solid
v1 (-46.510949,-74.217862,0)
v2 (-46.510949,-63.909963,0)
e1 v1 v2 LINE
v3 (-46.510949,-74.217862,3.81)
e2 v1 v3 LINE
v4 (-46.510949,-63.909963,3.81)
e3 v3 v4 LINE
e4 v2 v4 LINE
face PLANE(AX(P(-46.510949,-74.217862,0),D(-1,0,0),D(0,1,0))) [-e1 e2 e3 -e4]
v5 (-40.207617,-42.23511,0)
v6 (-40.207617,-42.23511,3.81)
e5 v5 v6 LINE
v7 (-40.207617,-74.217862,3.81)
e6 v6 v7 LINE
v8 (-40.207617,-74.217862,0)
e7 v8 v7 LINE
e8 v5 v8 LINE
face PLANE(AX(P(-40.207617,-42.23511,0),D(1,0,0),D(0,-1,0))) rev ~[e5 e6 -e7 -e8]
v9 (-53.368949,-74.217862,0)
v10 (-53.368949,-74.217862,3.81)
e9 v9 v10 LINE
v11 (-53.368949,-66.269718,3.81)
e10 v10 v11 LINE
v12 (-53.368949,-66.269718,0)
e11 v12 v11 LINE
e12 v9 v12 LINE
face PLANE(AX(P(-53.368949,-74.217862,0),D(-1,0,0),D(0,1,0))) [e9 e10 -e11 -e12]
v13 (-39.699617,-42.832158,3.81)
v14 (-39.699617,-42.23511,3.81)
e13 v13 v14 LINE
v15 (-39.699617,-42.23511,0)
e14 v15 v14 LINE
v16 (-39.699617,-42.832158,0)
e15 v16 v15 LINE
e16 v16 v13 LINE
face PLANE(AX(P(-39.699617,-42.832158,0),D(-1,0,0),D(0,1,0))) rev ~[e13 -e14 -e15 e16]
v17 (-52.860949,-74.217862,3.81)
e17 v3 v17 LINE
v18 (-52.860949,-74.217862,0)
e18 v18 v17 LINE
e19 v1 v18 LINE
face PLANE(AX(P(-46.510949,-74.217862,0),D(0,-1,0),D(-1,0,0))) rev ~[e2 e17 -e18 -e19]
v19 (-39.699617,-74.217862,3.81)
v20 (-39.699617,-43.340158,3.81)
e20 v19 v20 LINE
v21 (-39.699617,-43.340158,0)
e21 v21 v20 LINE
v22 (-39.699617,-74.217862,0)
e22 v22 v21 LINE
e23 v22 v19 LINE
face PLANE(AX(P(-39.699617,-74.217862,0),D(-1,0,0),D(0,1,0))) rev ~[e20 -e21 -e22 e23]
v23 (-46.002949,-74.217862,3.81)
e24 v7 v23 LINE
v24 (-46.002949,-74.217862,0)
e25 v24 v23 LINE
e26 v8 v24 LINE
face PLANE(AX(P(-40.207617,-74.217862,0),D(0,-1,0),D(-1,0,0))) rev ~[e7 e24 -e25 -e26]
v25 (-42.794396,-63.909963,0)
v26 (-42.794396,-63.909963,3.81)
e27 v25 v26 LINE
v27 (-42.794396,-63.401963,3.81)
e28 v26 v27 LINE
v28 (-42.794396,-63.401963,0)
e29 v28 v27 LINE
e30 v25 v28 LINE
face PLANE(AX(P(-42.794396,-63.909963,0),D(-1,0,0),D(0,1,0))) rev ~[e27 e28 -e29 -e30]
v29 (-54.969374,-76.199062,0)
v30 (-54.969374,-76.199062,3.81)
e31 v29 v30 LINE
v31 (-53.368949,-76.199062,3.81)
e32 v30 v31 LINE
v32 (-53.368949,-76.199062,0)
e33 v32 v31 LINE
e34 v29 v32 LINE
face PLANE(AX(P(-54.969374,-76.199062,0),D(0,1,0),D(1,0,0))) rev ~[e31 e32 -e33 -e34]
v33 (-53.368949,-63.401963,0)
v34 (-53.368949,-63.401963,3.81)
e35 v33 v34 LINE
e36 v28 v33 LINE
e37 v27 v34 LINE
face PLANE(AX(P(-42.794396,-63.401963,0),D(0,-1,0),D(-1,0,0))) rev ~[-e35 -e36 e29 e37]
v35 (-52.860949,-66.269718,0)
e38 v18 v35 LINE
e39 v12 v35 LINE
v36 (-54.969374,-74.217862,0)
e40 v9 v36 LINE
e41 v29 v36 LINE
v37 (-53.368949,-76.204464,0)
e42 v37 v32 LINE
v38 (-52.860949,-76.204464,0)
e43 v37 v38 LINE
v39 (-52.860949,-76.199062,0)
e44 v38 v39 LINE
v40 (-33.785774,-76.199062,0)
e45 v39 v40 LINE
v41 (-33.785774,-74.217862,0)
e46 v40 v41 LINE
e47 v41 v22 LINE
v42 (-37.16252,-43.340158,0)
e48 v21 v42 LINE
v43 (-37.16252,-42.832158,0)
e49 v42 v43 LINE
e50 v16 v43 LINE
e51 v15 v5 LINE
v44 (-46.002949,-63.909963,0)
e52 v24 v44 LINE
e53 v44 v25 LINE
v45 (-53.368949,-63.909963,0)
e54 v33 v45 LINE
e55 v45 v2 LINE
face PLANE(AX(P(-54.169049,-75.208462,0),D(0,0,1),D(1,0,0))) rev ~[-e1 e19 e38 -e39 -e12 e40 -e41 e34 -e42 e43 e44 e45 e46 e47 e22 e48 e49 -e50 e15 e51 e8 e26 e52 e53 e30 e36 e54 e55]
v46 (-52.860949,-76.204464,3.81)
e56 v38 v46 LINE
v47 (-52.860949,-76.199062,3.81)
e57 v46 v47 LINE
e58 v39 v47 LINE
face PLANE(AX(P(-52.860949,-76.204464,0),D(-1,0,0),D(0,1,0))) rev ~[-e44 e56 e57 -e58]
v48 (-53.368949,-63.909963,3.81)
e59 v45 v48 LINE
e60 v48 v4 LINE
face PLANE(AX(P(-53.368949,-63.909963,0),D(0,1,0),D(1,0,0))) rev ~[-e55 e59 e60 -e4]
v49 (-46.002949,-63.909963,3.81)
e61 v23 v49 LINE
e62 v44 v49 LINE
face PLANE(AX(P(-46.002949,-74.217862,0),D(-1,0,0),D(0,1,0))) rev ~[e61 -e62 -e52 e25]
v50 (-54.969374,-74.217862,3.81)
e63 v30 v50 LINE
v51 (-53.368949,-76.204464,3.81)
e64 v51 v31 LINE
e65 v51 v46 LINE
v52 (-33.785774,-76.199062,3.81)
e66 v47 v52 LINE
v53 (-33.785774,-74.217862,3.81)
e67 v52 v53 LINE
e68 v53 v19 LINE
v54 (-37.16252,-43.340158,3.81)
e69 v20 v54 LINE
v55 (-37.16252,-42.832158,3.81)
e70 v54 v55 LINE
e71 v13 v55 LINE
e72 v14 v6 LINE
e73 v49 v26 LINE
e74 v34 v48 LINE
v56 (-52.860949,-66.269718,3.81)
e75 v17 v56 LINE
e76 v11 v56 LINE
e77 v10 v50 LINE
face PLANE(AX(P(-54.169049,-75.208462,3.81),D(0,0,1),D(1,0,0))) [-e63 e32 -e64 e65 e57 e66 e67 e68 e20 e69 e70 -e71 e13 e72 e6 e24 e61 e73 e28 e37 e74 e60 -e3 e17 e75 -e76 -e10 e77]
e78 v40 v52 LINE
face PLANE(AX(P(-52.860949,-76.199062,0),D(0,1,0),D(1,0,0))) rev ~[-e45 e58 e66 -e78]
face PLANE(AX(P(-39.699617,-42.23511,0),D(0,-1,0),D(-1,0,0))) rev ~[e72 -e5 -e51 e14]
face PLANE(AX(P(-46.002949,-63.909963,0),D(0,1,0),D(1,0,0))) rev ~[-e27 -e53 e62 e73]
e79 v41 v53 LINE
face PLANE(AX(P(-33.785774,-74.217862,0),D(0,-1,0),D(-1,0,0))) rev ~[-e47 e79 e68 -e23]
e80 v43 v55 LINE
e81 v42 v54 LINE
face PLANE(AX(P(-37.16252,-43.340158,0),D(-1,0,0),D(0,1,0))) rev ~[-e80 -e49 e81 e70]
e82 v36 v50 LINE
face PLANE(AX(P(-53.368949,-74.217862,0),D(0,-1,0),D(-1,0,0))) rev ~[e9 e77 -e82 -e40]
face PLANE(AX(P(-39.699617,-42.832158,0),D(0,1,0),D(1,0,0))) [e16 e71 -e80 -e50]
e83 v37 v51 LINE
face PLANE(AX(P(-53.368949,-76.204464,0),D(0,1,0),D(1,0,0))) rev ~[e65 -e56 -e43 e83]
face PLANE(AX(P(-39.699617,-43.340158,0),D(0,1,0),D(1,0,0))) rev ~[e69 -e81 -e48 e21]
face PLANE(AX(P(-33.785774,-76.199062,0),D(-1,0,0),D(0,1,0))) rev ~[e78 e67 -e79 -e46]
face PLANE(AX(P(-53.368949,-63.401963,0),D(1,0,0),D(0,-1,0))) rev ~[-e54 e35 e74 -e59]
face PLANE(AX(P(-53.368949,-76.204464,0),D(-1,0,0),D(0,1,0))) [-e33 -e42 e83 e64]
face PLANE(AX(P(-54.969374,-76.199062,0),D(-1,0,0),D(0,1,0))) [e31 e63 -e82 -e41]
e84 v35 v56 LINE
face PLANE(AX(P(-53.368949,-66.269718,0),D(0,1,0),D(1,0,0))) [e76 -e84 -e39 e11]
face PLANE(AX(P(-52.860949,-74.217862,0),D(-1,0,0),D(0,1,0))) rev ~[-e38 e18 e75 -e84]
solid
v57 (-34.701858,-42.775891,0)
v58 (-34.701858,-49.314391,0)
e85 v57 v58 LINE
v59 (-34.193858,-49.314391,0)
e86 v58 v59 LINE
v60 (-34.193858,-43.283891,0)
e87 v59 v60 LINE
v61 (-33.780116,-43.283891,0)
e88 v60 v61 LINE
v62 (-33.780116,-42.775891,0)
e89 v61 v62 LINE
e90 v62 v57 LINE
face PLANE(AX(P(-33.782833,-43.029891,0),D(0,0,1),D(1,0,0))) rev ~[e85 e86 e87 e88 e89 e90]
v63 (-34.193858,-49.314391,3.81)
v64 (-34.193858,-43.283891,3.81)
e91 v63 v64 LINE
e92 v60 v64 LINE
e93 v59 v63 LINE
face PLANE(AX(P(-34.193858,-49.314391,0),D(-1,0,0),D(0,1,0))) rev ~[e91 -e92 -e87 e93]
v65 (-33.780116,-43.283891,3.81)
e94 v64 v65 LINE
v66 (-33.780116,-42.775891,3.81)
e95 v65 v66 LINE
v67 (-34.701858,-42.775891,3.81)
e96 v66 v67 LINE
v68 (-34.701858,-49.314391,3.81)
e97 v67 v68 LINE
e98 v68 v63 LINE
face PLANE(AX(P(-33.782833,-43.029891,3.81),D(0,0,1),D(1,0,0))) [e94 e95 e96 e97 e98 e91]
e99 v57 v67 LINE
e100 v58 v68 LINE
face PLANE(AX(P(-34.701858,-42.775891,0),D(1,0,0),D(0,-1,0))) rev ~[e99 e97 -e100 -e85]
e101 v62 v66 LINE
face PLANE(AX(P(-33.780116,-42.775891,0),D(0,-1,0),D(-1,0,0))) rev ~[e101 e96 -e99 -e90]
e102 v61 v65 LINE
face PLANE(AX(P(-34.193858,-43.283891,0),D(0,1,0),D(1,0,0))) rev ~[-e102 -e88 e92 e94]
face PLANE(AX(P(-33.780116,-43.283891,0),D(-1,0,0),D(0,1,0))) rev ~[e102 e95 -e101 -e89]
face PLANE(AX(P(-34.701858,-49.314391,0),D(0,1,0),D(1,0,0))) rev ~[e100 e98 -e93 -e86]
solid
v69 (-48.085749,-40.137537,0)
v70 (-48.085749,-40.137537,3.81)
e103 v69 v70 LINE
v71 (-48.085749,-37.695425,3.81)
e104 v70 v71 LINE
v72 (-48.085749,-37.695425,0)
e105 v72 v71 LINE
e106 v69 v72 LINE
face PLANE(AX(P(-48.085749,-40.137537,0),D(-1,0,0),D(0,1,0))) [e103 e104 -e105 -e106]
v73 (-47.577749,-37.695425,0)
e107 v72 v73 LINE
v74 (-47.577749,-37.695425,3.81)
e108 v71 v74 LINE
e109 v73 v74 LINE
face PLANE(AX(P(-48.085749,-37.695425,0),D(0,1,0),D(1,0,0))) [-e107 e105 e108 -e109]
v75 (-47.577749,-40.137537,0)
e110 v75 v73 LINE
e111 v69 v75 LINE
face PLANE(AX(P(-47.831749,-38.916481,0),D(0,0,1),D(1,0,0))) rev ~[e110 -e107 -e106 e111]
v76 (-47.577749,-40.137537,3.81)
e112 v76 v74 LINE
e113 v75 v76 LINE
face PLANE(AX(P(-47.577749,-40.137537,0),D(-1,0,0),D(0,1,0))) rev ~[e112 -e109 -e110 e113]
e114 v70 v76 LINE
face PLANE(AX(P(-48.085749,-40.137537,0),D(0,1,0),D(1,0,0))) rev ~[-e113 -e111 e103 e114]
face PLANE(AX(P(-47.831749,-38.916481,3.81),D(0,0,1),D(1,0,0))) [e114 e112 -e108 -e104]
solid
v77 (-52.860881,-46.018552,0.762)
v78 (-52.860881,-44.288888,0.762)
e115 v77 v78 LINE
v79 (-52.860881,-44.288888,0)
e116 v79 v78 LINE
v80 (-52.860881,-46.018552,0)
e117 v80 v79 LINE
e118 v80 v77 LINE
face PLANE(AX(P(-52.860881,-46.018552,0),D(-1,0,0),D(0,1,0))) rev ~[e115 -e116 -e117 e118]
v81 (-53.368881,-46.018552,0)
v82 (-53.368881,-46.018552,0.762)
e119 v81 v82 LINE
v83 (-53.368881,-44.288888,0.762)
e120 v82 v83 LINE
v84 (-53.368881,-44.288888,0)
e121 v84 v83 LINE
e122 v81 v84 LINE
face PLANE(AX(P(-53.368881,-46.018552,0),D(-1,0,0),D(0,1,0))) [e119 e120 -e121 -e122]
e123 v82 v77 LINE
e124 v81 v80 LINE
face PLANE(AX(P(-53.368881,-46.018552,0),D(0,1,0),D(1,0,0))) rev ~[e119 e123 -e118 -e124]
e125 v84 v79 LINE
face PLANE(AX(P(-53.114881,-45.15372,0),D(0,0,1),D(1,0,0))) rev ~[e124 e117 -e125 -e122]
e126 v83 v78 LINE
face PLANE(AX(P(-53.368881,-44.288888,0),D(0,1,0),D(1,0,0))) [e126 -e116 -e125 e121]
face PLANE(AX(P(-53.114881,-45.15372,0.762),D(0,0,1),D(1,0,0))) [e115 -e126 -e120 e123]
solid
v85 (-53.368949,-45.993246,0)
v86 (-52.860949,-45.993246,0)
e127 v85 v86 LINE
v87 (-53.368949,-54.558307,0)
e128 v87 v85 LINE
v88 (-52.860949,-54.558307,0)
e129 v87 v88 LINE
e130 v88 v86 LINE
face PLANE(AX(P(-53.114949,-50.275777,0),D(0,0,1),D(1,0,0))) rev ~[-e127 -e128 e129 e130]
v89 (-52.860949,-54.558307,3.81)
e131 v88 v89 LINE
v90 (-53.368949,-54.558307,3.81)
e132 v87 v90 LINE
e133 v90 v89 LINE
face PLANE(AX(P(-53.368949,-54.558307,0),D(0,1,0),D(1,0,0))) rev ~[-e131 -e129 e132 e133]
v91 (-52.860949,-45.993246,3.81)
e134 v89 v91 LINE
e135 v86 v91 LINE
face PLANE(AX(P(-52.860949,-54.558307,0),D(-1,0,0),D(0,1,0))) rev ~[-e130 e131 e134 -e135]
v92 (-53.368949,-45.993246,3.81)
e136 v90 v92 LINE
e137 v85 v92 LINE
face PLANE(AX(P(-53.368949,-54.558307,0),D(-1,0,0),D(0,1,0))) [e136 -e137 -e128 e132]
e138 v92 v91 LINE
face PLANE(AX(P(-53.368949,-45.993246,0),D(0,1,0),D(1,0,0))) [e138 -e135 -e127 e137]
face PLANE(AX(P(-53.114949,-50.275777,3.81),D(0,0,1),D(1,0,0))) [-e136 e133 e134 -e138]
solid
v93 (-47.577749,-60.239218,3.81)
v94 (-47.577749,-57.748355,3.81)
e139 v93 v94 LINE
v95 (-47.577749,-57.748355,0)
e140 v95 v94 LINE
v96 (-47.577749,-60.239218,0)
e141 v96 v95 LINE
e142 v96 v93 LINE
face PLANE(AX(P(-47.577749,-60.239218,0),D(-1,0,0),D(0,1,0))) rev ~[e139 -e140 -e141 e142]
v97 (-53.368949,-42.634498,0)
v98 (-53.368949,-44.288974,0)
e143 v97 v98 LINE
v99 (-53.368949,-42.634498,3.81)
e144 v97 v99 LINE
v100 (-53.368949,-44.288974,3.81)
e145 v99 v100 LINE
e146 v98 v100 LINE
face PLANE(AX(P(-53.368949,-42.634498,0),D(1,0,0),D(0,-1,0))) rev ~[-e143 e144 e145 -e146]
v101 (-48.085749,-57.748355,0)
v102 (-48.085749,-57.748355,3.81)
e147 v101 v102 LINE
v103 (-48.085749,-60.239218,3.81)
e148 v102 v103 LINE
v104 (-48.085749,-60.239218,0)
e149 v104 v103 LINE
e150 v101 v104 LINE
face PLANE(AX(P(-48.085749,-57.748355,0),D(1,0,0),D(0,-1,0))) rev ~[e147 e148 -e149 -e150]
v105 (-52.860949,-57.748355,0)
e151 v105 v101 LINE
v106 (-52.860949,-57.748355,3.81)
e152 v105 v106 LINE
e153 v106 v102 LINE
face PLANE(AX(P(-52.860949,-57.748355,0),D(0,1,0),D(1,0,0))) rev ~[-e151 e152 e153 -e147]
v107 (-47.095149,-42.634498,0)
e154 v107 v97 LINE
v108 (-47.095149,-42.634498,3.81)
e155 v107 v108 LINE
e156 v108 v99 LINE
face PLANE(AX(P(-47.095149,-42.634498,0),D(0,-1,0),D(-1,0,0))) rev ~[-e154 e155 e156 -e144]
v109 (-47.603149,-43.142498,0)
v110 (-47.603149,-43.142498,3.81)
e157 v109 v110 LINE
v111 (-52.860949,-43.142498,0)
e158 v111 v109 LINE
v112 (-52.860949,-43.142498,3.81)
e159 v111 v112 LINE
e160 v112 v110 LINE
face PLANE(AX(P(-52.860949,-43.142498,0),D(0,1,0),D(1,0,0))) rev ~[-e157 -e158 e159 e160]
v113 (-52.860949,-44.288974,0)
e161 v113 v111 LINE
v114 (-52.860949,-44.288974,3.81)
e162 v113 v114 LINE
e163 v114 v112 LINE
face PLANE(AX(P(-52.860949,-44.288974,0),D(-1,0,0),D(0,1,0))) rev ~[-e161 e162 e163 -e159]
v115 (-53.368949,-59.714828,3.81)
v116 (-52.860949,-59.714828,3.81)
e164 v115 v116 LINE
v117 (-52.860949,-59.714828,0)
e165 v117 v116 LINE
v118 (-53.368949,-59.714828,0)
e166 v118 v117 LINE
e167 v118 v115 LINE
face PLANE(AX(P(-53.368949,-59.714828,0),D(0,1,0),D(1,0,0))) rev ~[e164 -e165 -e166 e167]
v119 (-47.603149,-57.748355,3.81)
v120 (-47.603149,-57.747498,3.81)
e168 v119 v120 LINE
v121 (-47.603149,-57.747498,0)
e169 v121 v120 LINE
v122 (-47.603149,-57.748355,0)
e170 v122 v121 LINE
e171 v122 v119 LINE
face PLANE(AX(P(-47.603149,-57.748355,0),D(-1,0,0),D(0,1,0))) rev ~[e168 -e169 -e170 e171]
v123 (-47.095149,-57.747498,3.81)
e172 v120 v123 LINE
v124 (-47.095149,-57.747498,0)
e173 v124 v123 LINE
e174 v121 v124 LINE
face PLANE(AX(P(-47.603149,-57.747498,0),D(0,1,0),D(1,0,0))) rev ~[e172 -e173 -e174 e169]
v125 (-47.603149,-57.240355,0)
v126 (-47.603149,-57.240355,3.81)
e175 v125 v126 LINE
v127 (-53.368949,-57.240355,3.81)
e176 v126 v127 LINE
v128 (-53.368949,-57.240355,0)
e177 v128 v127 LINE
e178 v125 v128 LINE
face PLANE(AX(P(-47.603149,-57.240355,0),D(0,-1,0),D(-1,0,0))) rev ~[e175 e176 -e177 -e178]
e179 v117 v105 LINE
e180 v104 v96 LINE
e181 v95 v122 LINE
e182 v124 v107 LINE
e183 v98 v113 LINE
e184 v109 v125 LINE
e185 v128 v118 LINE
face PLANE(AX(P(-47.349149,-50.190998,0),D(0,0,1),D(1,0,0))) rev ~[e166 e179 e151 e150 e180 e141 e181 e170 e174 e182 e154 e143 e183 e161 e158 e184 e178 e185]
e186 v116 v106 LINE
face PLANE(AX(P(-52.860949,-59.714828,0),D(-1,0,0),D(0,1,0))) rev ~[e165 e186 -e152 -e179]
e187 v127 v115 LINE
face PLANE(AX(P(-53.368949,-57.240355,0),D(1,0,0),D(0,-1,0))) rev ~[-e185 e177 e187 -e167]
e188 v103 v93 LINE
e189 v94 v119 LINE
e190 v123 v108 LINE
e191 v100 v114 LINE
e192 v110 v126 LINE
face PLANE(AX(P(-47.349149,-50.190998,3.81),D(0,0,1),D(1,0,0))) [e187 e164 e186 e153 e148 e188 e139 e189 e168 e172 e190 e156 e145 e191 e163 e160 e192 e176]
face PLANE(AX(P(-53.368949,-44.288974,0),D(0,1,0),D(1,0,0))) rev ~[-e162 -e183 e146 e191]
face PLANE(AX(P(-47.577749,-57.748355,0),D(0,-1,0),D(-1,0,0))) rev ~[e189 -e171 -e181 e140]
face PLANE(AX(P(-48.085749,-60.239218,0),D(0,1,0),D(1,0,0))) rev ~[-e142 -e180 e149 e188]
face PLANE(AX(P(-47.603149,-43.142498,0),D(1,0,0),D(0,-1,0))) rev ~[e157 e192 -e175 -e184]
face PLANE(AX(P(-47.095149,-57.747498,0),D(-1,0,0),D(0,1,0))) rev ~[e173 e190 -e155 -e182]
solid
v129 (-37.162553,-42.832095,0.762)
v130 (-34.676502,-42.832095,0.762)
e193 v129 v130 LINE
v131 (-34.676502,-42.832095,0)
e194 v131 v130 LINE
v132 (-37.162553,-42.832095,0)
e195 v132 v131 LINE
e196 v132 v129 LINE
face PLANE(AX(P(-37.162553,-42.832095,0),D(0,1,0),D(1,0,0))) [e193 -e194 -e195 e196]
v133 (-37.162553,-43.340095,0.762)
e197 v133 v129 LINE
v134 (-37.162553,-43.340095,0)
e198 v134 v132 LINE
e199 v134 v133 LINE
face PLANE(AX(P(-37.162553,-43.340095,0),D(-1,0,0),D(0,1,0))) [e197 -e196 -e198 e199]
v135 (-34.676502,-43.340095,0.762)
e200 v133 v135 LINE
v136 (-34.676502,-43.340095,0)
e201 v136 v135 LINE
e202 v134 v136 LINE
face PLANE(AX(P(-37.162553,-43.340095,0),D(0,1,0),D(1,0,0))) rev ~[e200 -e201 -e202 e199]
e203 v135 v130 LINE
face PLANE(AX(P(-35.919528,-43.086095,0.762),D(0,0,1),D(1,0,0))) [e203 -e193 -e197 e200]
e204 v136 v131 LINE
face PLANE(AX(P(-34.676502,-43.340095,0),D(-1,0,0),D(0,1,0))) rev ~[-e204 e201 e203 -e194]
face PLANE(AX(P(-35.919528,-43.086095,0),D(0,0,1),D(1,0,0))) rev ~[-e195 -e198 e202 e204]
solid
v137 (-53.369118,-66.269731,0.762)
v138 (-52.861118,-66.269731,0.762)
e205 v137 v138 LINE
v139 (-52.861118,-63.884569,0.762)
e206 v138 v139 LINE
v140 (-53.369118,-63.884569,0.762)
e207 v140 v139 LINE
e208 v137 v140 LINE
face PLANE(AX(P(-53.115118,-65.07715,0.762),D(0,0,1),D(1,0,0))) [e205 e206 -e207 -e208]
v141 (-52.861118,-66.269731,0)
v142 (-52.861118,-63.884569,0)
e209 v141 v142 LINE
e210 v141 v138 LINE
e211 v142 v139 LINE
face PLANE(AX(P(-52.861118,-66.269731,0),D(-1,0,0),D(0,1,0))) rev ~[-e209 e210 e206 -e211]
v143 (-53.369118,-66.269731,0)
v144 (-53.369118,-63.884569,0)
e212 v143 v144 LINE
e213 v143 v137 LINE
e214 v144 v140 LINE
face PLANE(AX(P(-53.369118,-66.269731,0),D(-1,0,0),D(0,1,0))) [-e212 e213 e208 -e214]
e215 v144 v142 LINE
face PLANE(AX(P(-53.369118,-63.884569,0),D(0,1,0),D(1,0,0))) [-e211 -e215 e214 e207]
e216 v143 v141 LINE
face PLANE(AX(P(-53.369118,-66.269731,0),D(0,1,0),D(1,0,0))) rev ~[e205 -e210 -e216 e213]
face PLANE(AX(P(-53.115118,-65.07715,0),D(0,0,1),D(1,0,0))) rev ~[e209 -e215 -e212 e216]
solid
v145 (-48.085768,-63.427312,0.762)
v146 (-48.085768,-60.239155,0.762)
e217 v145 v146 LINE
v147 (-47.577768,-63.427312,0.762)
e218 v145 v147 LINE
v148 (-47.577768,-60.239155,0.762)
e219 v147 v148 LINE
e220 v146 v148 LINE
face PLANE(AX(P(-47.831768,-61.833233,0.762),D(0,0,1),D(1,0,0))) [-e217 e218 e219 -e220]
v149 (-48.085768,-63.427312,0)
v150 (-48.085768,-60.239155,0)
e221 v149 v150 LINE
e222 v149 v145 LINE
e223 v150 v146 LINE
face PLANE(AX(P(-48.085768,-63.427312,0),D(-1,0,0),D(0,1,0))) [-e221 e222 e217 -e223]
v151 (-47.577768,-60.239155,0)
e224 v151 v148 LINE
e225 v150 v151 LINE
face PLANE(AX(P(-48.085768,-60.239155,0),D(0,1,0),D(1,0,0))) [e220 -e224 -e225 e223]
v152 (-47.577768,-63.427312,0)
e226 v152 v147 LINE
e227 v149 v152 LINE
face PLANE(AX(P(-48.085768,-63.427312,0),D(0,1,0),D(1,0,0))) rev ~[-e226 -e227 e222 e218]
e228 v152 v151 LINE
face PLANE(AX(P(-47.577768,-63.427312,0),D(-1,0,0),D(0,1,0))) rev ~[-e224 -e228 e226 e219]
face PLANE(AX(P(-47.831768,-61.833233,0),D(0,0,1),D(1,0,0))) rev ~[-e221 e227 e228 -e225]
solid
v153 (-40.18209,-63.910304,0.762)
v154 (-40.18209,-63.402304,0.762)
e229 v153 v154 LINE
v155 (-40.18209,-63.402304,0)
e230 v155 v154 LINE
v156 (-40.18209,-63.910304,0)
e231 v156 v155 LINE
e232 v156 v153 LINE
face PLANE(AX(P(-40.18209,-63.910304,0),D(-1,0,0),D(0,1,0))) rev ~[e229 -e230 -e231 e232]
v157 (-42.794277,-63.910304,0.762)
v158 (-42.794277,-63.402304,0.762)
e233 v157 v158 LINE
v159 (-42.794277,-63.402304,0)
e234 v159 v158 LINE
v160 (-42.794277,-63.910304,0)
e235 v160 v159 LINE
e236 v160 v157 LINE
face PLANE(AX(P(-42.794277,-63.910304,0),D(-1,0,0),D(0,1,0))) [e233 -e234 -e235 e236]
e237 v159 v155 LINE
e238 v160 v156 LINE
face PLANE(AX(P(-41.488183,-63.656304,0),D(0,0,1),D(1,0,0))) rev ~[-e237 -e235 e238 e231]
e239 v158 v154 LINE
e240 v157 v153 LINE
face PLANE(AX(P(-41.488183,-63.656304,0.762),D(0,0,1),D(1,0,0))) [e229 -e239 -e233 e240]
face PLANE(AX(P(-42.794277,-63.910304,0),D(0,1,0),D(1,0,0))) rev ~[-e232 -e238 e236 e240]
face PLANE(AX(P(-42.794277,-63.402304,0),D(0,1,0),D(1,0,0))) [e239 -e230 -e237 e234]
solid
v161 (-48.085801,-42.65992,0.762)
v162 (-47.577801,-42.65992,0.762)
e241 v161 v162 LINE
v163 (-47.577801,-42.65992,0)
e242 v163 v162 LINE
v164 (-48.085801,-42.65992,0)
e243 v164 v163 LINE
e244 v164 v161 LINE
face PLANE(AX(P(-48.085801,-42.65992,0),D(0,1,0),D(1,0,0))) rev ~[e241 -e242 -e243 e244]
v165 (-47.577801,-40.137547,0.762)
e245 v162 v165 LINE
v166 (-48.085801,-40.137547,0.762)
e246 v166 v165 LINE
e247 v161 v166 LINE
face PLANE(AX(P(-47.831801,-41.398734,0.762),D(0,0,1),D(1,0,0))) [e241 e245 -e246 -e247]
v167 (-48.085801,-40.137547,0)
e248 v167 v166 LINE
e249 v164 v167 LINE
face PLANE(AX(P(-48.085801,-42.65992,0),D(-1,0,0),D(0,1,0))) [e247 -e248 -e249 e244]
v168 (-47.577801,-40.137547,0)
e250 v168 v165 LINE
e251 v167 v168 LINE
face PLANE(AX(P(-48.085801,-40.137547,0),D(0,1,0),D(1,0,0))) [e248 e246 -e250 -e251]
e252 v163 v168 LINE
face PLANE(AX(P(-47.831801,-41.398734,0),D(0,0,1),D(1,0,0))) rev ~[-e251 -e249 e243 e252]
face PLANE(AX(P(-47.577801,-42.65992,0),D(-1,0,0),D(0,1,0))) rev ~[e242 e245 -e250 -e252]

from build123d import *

# Parameters (mm, degrees)
F0_W     = 0.508
F0_H     = 2.4421113945
F1_DEPTH = 3.81
F0_W_2   = 1.6002
F0_H_2   = 1.9812
F0_W_3   = 0.0002247308
F0_H_3   = 7.948144058
F0_H_4   = 0.0054016709
F0_H_5   = 1.9428965652
F0_H_6   = 10.3078993953
F0_H_7   = 1.9640636646
F0_W_4   = 2.5370969934
F0_H_8   = 0.508
F0_W_5   = 0.0054331414
F0_H_9   = 6.0304999352
F0_H_10  = 8.5650607944
F0_H_11  = 1.1464767158
F0_H_12  = 1.9664727151
F2_W     = 0.508
F2_H     = 3.1881572
F3_DEPTH = 0.762
F2_H_2   = 2.3851616
F2_W_2   = 2.6121868
F2_H_3   = 0.508
F2_W_3   = 2.4860504
F2_H_4   = 1.7296638
F2_H_5   = 2.5223724


# Not quite as in the source:
# - ends of sketch curves that miss each other by under 0.0002 mm in the source are joined


with BuildPart() as f1:
    # F0 (on Top) → F1 (new body)
    with BuildSketch(Plane.XY):
        with Locations((-47.8317493596, -38.9164811265)):
            Rectangle(F0_W, F0_H)
    extrude(amount=F1_DEPTH)


with BuildPart() as f1b:
    # F0 (on Top) → F1, piece 2 (new body)
    with BuildSketch(Plane.XY):
        with Locations((-54.1690493596, -75.2084621686)):
            Rectangle(F0_W_2, F0_H_2)
        with Locations((-54.969261725, -75.2084621686)):
            Rectangle(F0_W_3, F0_H_2)
        with Locations((-53.1149493596, -75.2084621686)):
            Rectangle(F0_W, F0_H_2)
        with Locations((-53.1149493596, -70.2437901396)):
            Rectangle(F0_W, F0_H_3)
        with Locations((-53.1149493596, -76.2017630041)):
            Rectangle(F0_W, F0_H_4)
        Polygon((-46.5109493596, -74.2178621686), (-52.8609493596, -74.2178621686), (-52.8609493596, -76.1990621686), (-33.7857740904, -76.1990621686), (-33.7857740904, -74.2178621686), (-39.6996169848, -74.2178621686), (-39.6996169848, -76.1819258332), (-40.2076169848, -76.1819258332), (-40.2076169848, -74.2178621686), (-46.0029493596, -74.2178621686), (-46.0029493596, -76.1607587337), (-46.5109493596, -76.1607587337), align=None)
        with Locations((-46.2569493596, -75.1893104512)):
            Rectangle(F0_W, F0_H_5)
        with Locations((-46.2569493596, -69.063912471)):
            Rectangle(F0_W, F0_H_6)
        Polygon((-53.3689493596, -63.9099627733), (-46.5109493596, -63.9099627733), (-46.0029493596, -63.9099627733), (-42.7943961977, -63.9099627733), (-42.7943961977, -63.4019627733), (-53.3689493596, -63.4019627733), align=None)
        with Locations((-39.9536169848, -75.1998940009)):
            Rectangle(F0_W, F0_H_7)
        Polygon((-40.2076169848, -42.2351099551), (-40.2076169848, -74.2178621686), (-39.6996169848, -74.2178621686), (-39.6996169848, -43.3401577175), (-39.6996169848, -42.8321577175), (-39.6996169848, -42.2351099551), align=None)
        with Locations((-38.4310684881, -43.0861577175)):
            Rectangle(F0_W_4, F0_H_8)
    extrude(amount=F1_DEPTH)


with BuildPart() as f1c:
    # F0 (on Top) → F1, piece 3 (new body)
    with BuildSketch(Plane.XY):
        with Locations((-33.7828327889, -43.0298909328)):
            Rectangle(F0_W_5, F0_H_8)
        Polygon((-33.7855493596, -43.2838909328), (-33.7855493596, -42.7758909328), (-34.7018577158, -42.7758909328), (-34.7018577158, -43.2838909328), (-34.1938577158, -43.2838909328), align=None)
        with Locations((-34.4478577158, -46.2991409004)):
            Rectangle(F0_W, F0_H_9)
    extrude(amount=F1_DEPTH)


with BuildPart() as f1d:
    # F0 (on Top) → F1, piece 4 (new body)
    with BuildSketch(Plane.XY):
        with Locations((-53.1149493596, -50.2757765353)):
            Rectangle(F0_W, F0_H_10)
    extrude(amount=F1_DEPTH)


with BuildPart() as f1e:
    # F0 (on Top) → F1, piece 5 (new body)
    with BuildSketch(Plane.XY):
        Polygon((-47.0951493596, -57.7474975395), (-47.0951493596, -42.6344975395), (-47.6031493596, -42.6344975395), (-47.6031493596, -43.1424975395), (-47.6031493596, -57.2403549714), (-47.6031493596, -57.7474975395), align=None)
        Polygon((-47.6031493596, -43.1424975395), (-47.6031493596, -42.6344975395), (-53.3689493596, -42.6344975395), (-53.3689493596, -43.1424975395), (-52.8609493596, -43.1424975395), align=None)
        Polygon((-47.6031493596, -57.7483549714), (-47.6031493596, -57.7474975395), (-47.6031493596, -57.2403549714), (-53.3689493596, -57.2403549714), (-53.3689493596, -57.7483549714), (-52.8609493596, -57.7483549714), (-48.0857493596, -57.7483549714), align=None)
        with Locations((-53.1149493596, -43.7157358974)):
            Rectangle(F0_W, F0_H_11)
        Polygon((-47.5777493596, -57.7483549714), (-47.6031493596, -57.7483549714), (-48.0857493596, -57.7483549714), (-48.0857493596, -60.2392181754), (-47.5777493596, -60.2392181754), align=None)
        with Locations((-53.1149493596, -58.731591329)):
            Rectangle(F0_W, F0_H_12)
    extrude(amount=F1_DEPTH)


with BuildPart() as f3:
    # F2 (on Top) → F3 (new body)
    with BuildSketch(Plane.XY):
        with Locations((-47.8317679776, -61.8332334061)):
            Rectangle(F2_W, F2_H)
    extrude(amount=F3_DEPTH)


with BuildPart() as f3b:
    # F2 (on Top) → F3, piece 2 (new body)
    with BuildSketch(Plane.XY):
        with Locations((-53.1151176414, -65.0771501798)):
            Rectangle(F2_W, F2_H_2)
    extrude(amount=F3_DEPTH)


with BuildPart() as f3c:
    # F2 (on Top) → F3, piece 3 (new body)
    with BuildSketch(Plane.XY):
        with Locations((-41.4881832206, -63.6563040937)):
            Rectangle(F2_W_2, F2_H_3)
    extrude(amount=F3_DEPTH)


with BuildPart() as f3d:
    # F2 (on Top) → F3, piece 4 (new body)
    with BuildSketch(Plane.XY):
        with Locations((-35.9195275606, -43.086094628)):
            Rectangle(F2_W_3, F2_H_3)
    extrude(amount=F3_DEPTH)


with BuildPart() as f3e:
    # F2 (on Top) → F3, piece 5 (new body)
    with BuildSketch(Plane.XY):
        with Locations((-53.1148813448, -45.1537201351)):
            Rectangle(F2_W, F2_H_4)
    extrude(amount=F3_DEPTH)


with BuildPart() as f3f:
    # F2 (on Top) → F3, piece 6 (new body)
    with BuildSketch(Plane.XY):
        with Locations((-47.8318013034, -41.398733509)):
            Rectangle(F2_W, F2_H_5)
    extrude(amount=F3_DEPTH)


solid = Compound([f1.part, f1b.part, f1c.part, f1d.part, f1e.part, f3.part, f3b.part, f3c.part, f3d.part, f3e.part, f3f.part])
